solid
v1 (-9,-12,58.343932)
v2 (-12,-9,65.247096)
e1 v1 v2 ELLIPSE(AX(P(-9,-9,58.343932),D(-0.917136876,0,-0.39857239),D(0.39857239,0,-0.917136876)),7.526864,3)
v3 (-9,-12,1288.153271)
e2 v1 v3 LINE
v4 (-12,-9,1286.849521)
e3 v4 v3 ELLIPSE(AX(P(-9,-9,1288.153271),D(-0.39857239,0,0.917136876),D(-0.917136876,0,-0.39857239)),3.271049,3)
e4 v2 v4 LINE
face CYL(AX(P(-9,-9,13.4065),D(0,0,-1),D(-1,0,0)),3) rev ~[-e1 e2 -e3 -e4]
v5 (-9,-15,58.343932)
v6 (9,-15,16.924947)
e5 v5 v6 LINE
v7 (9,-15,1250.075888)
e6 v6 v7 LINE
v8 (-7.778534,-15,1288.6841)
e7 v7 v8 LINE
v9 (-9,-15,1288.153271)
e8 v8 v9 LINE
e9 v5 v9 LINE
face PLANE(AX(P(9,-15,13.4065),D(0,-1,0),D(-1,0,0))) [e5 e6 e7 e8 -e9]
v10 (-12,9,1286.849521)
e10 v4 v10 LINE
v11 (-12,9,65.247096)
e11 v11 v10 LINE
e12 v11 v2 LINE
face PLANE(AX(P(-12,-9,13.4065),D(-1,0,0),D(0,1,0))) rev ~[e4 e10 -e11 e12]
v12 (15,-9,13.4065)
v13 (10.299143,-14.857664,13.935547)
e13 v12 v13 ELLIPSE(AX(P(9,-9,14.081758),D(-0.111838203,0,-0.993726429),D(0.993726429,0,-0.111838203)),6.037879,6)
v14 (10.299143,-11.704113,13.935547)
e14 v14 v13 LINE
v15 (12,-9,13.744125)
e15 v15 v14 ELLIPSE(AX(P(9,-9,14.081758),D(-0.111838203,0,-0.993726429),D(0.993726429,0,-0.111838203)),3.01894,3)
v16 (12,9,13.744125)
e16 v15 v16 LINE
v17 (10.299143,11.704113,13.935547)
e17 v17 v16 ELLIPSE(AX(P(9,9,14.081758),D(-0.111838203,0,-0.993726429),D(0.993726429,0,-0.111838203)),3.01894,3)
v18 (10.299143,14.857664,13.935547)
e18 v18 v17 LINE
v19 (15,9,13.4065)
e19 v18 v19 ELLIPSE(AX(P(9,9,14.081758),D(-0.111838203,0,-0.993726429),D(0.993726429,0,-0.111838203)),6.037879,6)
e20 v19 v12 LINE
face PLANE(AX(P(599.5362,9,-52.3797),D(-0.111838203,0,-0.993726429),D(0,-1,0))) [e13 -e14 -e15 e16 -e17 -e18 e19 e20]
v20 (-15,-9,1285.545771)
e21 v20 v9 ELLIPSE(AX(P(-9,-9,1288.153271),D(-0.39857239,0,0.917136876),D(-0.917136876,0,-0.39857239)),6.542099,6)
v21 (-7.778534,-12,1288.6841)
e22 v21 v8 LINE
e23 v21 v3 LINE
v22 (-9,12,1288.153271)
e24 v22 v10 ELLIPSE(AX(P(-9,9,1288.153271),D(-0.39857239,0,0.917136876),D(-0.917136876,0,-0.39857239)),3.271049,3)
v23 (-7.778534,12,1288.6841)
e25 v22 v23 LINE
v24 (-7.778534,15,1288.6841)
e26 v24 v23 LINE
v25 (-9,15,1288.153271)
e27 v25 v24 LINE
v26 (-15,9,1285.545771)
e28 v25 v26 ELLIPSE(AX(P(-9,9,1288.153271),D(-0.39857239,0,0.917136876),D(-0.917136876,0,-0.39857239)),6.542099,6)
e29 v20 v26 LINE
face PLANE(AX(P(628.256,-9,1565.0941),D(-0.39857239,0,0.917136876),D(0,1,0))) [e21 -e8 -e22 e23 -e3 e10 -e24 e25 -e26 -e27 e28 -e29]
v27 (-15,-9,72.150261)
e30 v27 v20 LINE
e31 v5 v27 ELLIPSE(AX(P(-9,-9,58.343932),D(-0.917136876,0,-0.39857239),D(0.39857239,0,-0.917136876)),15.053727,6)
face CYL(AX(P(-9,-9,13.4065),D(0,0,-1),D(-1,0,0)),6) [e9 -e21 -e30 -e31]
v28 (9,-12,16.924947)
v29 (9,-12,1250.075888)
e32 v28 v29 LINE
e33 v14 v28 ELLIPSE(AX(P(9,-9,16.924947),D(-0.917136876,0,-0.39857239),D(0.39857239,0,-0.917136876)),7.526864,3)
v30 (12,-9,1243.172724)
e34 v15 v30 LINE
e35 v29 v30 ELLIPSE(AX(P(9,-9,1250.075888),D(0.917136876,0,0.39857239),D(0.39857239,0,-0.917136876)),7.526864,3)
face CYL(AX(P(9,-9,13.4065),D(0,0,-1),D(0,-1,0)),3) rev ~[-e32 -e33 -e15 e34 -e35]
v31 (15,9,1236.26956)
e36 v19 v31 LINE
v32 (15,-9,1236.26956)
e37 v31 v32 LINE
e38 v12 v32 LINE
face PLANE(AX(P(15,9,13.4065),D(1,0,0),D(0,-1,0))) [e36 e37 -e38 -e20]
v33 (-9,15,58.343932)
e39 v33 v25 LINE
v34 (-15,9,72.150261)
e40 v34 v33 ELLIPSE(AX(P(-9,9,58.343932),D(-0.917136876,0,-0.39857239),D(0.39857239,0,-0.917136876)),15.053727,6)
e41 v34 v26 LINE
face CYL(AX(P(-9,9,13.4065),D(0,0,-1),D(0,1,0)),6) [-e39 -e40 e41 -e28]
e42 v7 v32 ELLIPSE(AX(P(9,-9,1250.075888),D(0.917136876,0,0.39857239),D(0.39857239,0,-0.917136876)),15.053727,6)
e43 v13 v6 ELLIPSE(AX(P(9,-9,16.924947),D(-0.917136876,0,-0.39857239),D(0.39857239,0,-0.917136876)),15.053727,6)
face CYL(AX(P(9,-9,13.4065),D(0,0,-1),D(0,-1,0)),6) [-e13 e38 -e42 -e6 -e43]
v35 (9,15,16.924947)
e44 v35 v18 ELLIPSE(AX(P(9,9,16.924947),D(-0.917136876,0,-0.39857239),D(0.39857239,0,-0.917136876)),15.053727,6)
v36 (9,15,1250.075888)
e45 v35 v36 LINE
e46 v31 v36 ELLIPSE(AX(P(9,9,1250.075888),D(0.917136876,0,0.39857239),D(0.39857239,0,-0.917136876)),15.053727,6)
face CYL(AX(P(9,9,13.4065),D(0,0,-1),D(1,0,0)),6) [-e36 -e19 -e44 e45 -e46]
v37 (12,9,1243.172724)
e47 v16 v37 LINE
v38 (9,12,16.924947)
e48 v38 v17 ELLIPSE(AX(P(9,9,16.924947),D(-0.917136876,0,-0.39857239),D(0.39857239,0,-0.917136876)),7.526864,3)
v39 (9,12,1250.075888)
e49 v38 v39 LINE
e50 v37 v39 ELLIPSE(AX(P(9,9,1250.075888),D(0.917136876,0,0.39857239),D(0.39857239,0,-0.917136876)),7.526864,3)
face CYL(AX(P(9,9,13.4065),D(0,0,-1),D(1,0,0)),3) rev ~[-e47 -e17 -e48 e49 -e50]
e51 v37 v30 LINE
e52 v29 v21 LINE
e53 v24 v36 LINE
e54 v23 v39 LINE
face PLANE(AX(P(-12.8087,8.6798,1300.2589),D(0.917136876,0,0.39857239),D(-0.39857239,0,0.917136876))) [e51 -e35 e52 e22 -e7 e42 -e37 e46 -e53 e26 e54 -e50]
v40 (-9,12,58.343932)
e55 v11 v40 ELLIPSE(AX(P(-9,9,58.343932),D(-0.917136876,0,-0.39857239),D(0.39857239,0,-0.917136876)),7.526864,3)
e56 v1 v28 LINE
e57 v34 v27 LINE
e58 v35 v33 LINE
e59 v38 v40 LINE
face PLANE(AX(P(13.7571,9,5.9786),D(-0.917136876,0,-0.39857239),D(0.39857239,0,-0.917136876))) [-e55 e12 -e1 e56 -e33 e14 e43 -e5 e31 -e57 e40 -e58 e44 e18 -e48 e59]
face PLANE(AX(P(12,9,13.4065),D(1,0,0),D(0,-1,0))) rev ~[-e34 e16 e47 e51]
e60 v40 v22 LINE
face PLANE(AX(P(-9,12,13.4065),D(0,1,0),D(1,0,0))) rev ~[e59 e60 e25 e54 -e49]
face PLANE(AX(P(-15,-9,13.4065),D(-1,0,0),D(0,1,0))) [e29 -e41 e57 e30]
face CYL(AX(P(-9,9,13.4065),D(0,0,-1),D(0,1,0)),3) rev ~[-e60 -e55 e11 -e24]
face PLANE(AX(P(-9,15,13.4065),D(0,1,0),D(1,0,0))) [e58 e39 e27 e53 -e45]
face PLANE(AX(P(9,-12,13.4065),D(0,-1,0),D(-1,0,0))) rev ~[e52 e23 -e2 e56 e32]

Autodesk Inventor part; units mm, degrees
ref_plane "Start Plane" through (0, 0, 13.4065) normal (0, 0, 1) x (1, 0, 0)
ref_plane "End Plane" through (0, 0, 1288.6841) normal (0, 0, 1) x (1, 0, 0)
sketch "Sketch" plane through (0, 0, 0) normal (0, 0, 1) x (1, 0, 0)
  line L0 (-15, -9) -> (-15, 9)
  line L1 (-9, 15) -> (9, 15)
  line L2 (15, 9) -> (15, -9)
  line L3 (9, -15) -> (-9, -15)
  arc A0 (-15, -9) -> (-9, -15) centre (-9, -9) ccw
  arc A1 (-9, 15) -> (-15, 9) centre (-9, 9) ccw
  arc A2 (15, 9) -> (9, 15) centre (9, 9) ccw
  arc A3 (9, -15) -> (15, -9) centre (9, -9) ccw
  arc A4 (-9, 12) -> (-12, 9) centre (-9, 9) ccw
  line L4 (-9, 12) -> (9, 12)
  arc A5 (12, 9) -> (9, 12) centre (9, 9) ccw
  line L5 (12, 9) -> (12, -9)
  arc A6 (9, -12) -> (12, -9) centre (9, -9) ccw
  line L6 (9, -12) -> (-9, -12)
  arc A7 (-12, -9) -> (-9, -12) centre (-9, -9) ccw
  line L7 (-12, -9) -> (-12, 9)
  line L8 (0, 22.7397) -> (0, -22.7397) construction
  line L9 (-22.7397, 0) -> (22.7397, 0) construction
  dimension "d7" = 6
  dimension "d10" = 30
  dimension "d11" = 30
  dimension "d12" = 3
  dimension "d15" = 15
  dimension "d16" = 15
extrude "Body" add sketch "Sketch" along normal up to surface (1275.2776 mm away) from surface at 13.4065
sketch "Sketch3" plane through (0, 0, 0) normal (0, 0, 1) x (1, 0, 0)
  line L0 (0, 0) -> (10, 0)
ref_plane "Work Plane3" through (0, 0, 0) normal (0, -1, 0) x (1, 0, 0)
ref_plane "Work Plane4" through (628.256, -9, 1565.0941) normal (-0.3985724, 0, 0.9171369) x (0.9171369, 0, 0.3985724)
split "Split1" plane through (628.256, -9, 1565.0941) removes the side toward (-0.3985724, 0, 0.9171369)
ref_plane "Work Plane5" through (-12.8087, 8.6798, 1300.2589) normal (0.9171369, 0, 0.3985724) x (0.3985724, 0, -0.9171369)
split "Split2" plane through (-12.8087, 8.6798, 1300.2589) removes the side toward (0.9171369, 0, 0.3985724)
ref_plane "Work Plane6" through (-13.7571, 9, 1302.4412) normal (0.9171369, 0, 0.3985724) x (0.3985724, 0, -0.9171369)
split "Split3" plane through (-13.7571, 9, 1302.4412) removes the side toward (0.9171369, 0, 0.3985724)
ref_plane "Work Plane7" through (13.7571, 9, 5.9786) normal (-0.9171369, 0, -0.3985724) x (-0.3985724, 0, 0.9171369)
split "Split4" plane through (13.7571, 9, 5.9786) removes the side toward (-0.9171369, 0, -0.3985724)
ref_plane "Work Plane8" through (599.5362, 9, -52.3797) normal (-0.1118382, 0, -0.9937264) x (-0.9937264, 0, 0.1118382)
split "Split5" plane through (599.5362, 9, -52.3797) removes the side toward (-0.1118382, 0, -0.9937264)
sketch "Sketch4" plane through (0, 0, 0) normal (0, -1, 0) x (1, 0, 0)
  line L0 (-2, 13.4065) -> (12, 13.4065) projected
  line L1 (-2, 1288.6841) -> (12, 1288.6841) projected
  dimension "d18" = 1275.2776
equation "\"d7\" = G_IR"
equation "\"d10\" = G_H"
equation "\"d11\" = G_W"
equation "\"d12\" = G_T"
equation "\"d15\" = 0.5 * d10"
equation "\"d16\" = 0.5 * d11"
equation "\"d3\" = G_L"
equation "\"G_W\" = 30"
equation "\"G_H\" = 30"
equation "\"G_T\" = 3"
equation "\"G_IR\" = 6"
equation "\"G_L\" = d18"
equation "\"G_OFFSET_START\" = -13.40653"
equation "\"G_OFFSET_END\" = -19.73564"
equation "\"d13\" = -G_OFFSET_START"
equation "\"d14\" = G_OFFSET_END + B_L"
equation "\"B_L\" = 1308.41975"
properties part number "DIN EN 10219-2 - 30 x 30 x 3  - 1275.28" material "Steel, Mild"
